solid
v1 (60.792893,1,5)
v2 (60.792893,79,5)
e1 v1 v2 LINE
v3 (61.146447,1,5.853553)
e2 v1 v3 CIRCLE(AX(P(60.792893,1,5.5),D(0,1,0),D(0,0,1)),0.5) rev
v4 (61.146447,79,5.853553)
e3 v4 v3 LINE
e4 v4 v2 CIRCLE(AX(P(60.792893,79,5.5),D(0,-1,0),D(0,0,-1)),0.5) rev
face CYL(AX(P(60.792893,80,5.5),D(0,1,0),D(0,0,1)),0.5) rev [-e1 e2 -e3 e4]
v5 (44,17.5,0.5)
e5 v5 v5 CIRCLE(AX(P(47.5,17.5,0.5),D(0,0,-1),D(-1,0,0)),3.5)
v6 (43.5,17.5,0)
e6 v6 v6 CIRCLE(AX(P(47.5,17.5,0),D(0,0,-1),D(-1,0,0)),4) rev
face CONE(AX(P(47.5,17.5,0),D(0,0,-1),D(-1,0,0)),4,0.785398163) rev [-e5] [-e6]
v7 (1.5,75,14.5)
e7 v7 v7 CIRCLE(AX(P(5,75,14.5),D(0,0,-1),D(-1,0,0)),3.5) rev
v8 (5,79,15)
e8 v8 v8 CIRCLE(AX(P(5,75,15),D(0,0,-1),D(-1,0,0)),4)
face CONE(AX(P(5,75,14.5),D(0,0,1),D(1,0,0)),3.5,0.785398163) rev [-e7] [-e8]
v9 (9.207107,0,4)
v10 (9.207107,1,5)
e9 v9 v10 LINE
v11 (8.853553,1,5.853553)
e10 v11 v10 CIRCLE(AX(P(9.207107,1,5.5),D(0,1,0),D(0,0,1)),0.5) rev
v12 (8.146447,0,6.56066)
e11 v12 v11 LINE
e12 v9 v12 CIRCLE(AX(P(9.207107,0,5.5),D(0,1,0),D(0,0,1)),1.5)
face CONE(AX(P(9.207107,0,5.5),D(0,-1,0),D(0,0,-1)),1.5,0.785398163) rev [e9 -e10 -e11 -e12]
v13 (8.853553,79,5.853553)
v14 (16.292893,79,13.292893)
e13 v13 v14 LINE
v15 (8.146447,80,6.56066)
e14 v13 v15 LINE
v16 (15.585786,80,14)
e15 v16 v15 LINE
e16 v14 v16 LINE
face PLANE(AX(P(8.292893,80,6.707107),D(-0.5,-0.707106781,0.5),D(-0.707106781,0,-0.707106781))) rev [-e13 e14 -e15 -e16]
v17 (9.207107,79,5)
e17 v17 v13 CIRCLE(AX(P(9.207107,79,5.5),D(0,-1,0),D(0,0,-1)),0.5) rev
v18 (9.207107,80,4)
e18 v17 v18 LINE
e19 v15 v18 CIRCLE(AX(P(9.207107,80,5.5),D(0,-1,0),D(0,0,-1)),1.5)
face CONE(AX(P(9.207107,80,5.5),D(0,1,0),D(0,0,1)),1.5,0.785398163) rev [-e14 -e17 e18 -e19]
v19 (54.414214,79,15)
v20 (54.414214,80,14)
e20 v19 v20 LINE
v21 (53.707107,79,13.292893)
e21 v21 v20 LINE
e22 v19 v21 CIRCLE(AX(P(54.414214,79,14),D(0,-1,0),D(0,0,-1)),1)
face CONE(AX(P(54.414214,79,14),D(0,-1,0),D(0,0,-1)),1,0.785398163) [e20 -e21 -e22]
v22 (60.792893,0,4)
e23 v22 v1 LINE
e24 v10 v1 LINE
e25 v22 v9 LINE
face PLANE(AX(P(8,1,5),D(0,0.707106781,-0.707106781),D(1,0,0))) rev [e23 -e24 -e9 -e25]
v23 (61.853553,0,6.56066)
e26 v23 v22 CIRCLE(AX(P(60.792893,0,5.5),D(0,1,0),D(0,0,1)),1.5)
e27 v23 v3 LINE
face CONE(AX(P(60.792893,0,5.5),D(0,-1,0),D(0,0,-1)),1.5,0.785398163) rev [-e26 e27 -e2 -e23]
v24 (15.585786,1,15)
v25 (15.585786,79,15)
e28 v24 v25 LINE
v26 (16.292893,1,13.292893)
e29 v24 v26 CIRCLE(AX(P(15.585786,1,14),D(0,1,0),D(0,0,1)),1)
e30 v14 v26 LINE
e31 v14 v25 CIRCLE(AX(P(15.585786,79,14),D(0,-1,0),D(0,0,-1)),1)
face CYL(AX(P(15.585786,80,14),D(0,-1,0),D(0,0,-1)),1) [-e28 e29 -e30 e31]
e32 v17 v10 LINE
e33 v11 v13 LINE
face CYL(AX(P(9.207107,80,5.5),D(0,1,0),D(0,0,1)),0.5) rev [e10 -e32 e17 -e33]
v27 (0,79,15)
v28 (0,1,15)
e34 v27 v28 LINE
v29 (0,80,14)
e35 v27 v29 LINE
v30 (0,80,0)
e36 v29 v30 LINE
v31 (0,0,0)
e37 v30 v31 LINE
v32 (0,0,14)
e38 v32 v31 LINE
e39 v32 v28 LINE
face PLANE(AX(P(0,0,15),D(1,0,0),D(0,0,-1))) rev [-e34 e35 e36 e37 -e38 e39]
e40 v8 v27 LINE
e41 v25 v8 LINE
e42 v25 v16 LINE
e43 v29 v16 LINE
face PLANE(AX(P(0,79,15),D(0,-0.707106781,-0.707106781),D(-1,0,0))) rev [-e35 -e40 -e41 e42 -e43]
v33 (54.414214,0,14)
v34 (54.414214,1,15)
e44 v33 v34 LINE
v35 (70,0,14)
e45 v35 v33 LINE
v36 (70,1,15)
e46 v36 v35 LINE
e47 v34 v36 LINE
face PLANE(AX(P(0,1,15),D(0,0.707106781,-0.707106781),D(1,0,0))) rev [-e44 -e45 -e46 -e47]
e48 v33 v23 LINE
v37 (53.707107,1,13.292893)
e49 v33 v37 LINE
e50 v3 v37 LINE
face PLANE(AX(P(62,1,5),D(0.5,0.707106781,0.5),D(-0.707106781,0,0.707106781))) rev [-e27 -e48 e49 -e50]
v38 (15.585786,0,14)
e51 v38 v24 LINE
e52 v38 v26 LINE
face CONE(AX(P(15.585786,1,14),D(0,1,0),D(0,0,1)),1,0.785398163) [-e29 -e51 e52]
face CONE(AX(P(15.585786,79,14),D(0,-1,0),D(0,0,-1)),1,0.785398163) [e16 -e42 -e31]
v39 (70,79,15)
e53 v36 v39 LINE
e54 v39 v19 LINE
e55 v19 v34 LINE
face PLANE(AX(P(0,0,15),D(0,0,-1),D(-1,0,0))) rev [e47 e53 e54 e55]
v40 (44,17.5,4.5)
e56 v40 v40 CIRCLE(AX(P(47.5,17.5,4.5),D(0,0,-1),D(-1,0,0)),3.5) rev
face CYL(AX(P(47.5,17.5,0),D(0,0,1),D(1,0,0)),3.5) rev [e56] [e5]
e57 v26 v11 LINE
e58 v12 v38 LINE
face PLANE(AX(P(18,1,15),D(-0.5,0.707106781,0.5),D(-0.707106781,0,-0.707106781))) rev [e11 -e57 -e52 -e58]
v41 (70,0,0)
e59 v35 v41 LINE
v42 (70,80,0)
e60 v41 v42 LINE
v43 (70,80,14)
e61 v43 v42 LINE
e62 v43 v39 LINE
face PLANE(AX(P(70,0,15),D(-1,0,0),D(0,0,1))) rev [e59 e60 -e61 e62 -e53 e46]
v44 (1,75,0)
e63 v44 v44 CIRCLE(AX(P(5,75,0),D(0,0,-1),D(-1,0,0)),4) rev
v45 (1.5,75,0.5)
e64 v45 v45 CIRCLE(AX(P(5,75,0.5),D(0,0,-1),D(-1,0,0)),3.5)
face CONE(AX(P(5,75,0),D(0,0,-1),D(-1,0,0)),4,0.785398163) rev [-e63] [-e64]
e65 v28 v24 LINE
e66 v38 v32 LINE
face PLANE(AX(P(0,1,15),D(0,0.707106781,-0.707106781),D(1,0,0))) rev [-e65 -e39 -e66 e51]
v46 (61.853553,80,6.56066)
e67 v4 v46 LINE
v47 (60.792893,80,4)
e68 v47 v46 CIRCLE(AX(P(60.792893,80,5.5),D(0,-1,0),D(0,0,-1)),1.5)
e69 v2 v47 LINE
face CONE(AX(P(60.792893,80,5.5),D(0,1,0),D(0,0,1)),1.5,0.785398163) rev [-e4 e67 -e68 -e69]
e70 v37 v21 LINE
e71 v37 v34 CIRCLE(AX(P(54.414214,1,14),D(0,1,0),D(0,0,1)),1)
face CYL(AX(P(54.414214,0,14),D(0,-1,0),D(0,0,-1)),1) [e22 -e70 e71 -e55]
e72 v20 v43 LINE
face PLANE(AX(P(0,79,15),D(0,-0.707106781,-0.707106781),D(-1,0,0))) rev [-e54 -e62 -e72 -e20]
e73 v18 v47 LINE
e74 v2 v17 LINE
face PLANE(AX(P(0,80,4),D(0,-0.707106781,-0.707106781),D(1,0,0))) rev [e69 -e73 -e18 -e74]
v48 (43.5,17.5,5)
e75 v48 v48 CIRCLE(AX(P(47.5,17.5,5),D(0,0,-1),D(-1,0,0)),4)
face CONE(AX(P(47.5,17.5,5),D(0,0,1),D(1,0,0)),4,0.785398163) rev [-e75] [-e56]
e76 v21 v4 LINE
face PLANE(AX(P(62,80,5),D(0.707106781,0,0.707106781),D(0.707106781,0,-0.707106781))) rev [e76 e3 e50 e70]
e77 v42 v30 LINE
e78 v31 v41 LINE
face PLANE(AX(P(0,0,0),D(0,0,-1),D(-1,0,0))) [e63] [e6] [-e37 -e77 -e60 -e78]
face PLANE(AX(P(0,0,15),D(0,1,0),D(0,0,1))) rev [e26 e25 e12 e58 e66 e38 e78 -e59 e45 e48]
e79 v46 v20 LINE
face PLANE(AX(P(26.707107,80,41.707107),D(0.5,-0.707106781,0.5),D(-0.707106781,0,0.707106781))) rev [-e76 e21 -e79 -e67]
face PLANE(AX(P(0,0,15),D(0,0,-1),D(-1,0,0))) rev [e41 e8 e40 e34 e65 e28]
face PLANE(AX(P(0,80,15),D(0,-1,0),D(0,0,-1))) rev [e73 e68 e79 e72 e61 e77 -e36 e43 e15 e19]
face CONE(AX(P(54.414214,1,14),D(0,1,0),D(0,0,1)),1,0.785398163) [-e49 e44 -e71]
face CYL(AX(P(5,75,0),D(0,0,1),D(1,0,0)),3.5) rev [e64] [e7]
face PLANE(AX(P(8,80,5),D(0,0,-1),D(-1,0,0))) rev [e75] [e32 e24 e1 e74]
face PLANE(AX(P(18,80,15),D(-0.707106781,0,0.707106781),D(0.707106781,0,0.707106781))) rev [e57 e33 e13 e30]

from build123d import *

# Parameters (mm, degrees)
SKETCH1_W               = 70
SKETCH1_H               = 80
BOSS_EXTRUDE1_DEPTH     = 15
CUT_EXTRUDE1_DEPTH      = 108.354552768
SKETCH3_R               = 3.5
CUT_EXTRUDE2_DEPTH      = 108.354552768
CUT_EXTRUDE3_DEPTH      = 107.77078252
CUT_EXTRUDE3_DEPTH_BACK = 107.77078252
SKETCH4_R               = 3.5
FILLET1_R               = 0.5
FILLET2_R               = 1
CHAMFER1_SIZE           = 1
CHAMFER2_SIZE           = 0.5


with BuildPart() as part:
    # Sketch1 → Boss-Extrude1 (new body)
    with BuildSketch(Plane.XY):
        with Locations((35, 40)):
            Rectangle(SKETCH1_W, SKETCH1_H)
    extrude(amount=BOSS_EXTRUDE1_DEPTH)

    # Sketch2 → Cut-Extrude1 (cut, through all)
    with BuildSketch(Plane.XZ):
        Polygon((18, 15), (8, 5), (62, 5), (52, 15), align=None)
    extrude(amount=-CUT_EXTRUDE1_DEPTH, mode=Mode.SUBTRACT)

    # Sketch3 → Cut-Extrude2 (cut, through all)
    with BuildSketch(Plane.XY.offset(15)):
        with Locations((5, 75)):
            Circle(SKETCH3_R)
    extrude(amount=-CUT_EXTRUDE2_DEPTH, mode=Mode.SUBTRACT)

    # Sketch4 → Cut-Extrude3 (cut, two sides: drawn at the far end of the back side and taken through both)
    with BuildSketch(Plane.XY.offset(5).offset(-CUT_EXTRUDE3_DEPTH_BACK)):
        with Locations((47.5, 17.5)):
            Circle(SKETCH4_R)
    extrude(amount=CUT_EXTRUDE3_DEPTH + CUT_EXTRUDE3_DEPTH_BACK, mode=Mode.SUBTRACT)

    # Fillet1
    # the kernel refuses this fillet: 0.5 mm, written as the material it adds along each edge
    with BuildSketch(Plane(origin=(62, 0, 5), x_dir=(-0.7071067811865527, 0, 0.7071067811865425), z_dir=(0, 1, 0))) as fillet1_piece_1:
        with BuildLine():
            CenterArc((FILLET1_R * 2.41421356237, -FILLET1_R), FILLET1_R, 90, 135)
            Line((FILLET1_R * 1.70710678119, -FILLET1_R * 1.70710678119), (0, 0))
            Line((0, 0), (FILLET1_R * 2.41421356237, 0))
        make_face()
    extrude(amount=80)
    with BuildSketch(Plane(origin=(8, 73.785008685, 5), x_dir=(1, 0, 0), z_dir=(0, 1, 0))) as fillet1_piece_2_section:
        with BuildLine():
            CenterArc((FILLET1_R * 2.41421356237, -FILLET1_R), FILLET1_R, 90, 135)
            Line((FILLET1_R * 1.70710678119, -FILLET1_R * 1.70710678119), (0, 0))
            Line((0, 0), (FILLET1_R * 2.41421356237, 0))
        make_face()
    fillet1_piece_2 = extrude(amount=6.214991315, mode=Mode.PRIVATE)
    fillet1_piece_2 = fillet1_piece_2 - Plane(origin=(5, 75, 5.232830095), x_dir=(1, 0, 0), z_dir=(0, 0, 1)) * Cylinder(3.5, 18, mode=Mode.PRIVATE)
    add(fillet1_piece_2)
    with BuildSketch(Plane(origin=(8, 0, 5), x_dir=(1, 0, 0), z_dir=(0, 1, 0))) as fillet1_piece_3_section:
        with BuildLine():
            CenterArc((FILLET1_R * 2.41421356237, -FILLET1_R), FILLET1_R, 90, 135)
            Line((FILLET1_R * 1.70710678119, -FILLET1_R * 1.70710678119), (0, 0))
            Line((0, 0), (FILLET1_R * 2.41421356237, 0))
        make_face()
    fillet1_piece_3 = extrude(amount=76.214991315, mode=Mode.PRIVATE)
    fillet1_piece_3 = fillet1_piece_3 - Plane(origin=(5, 75, 5.222265381), x_dir=(1, 0, 0), z_dir=(0, 0, 1)) * Cylinder(3.5, 158, mode=Mode.PRIVATE)
    add(fillet1_piece_3)

    # Fillet2
    fillet2_edges = [part.edges().sort_by_distance(p)[0] for p in [
        (18, 40, 15),
        (52, 40, 15),
    ]]
    fillet(fillet2_edges, radius=FILLET2_R)

    # Chamfer1
    chamfer1_edges = [part.edges().sort_by_distance(p)[0] for p in [
        (62.207106781, 80, 15),
        (57.426776695, 0, 9.573223305),
        (57.426776695, 80, 9.573223305),
        (35, 0, 5),
        (35, 80, 5),
        (61.254832985, 0, 5.308658284),
        (61.254832985, 80, 5.308658284),
        (8.745167015, 0, 5.308658284),
        (8.745167015, 80, 5.308658284),
        (62.207106781, 0, 15),
        (12.573223305, 0, 9.573223305),
        (16.50966597, 0, 14.382683432),
        (53.49033403, 0, 14.382683432),
        (7.792893219, 80, 15),
        (12.573223305, 80, 9.573223305),
        (16.50966597, 80, 14.382683432),
        (53.49033403, 80, 14.382683432),
        (7.792893219, 0, 15),
    ]]
    chamfer(chamfer1_edges, length=CHAMFER1_SIZE)

    # Chamfer2
    # the kernel refuses this chamfer: 0.5 mm, written as the material it takes off along each edge
    with BuildSketch(Plane(origin=(5, 75, 0), x_dir=(1, 0, 0), z_dir=(0, -1, 0))) as chamfer2_piece_1:
        Polygon((3.5, CHAMFER2_SIZE), (3.5 + CHAMFER2_SIZE, 0), (3.5, 0), align=None)
    revolve(axis=Axis((5, 75, 0), (0, 0, 1)), mode=Mode.SUBTRACT)
    with BuildSketch(Plane(origin=(5, 75, 15), x_dir=(1, 0, 0), z_dir=(0, -1, 0))) as chamfer2_piece_2:
        Polygon((3.5 + CHAMFER2_SIZE, 0), (3.5, -CHAMFER2_SIZE), (3.5, 0), align=None)
    revolve(axis=Axis((5, 75, 15), (0, 0, 1)), mode=Mode.SUBTRACT)
    with BuildSketch(Plane(origin=(47.5, 17.5, 0), x_dir=(1, 0, 0), z_dir=(0, -1, 0))) as chamfer2_piece_3:
        Polygon((3.5 + CHAMFER2_SIZE, 0), (3.5, CHAMFER2_SIZE), (3.5, 0), align=None)
    revolve(axis=Axis((47.5, 17.5, 0), (0, 0, 1)), mode=Mode.SUBTRACT)
    with BuildSketch(Plane(origin=(47.5, 17.5, 5), x_dir=(1, 0, 0), z_dir=(0, -1, 0))) as chamfer2_piece_4:
        Polygon((3.5 + CHAMFER2_SIZE, 0), (3.5, -CHAMFER2_SIZE), (3.5, 0), align=None)
    revolve(axis=Axis((47.5, 17.5, 5), (0, 0, 1)), mode=Mode.SUBTRACT)


solid = part.part
